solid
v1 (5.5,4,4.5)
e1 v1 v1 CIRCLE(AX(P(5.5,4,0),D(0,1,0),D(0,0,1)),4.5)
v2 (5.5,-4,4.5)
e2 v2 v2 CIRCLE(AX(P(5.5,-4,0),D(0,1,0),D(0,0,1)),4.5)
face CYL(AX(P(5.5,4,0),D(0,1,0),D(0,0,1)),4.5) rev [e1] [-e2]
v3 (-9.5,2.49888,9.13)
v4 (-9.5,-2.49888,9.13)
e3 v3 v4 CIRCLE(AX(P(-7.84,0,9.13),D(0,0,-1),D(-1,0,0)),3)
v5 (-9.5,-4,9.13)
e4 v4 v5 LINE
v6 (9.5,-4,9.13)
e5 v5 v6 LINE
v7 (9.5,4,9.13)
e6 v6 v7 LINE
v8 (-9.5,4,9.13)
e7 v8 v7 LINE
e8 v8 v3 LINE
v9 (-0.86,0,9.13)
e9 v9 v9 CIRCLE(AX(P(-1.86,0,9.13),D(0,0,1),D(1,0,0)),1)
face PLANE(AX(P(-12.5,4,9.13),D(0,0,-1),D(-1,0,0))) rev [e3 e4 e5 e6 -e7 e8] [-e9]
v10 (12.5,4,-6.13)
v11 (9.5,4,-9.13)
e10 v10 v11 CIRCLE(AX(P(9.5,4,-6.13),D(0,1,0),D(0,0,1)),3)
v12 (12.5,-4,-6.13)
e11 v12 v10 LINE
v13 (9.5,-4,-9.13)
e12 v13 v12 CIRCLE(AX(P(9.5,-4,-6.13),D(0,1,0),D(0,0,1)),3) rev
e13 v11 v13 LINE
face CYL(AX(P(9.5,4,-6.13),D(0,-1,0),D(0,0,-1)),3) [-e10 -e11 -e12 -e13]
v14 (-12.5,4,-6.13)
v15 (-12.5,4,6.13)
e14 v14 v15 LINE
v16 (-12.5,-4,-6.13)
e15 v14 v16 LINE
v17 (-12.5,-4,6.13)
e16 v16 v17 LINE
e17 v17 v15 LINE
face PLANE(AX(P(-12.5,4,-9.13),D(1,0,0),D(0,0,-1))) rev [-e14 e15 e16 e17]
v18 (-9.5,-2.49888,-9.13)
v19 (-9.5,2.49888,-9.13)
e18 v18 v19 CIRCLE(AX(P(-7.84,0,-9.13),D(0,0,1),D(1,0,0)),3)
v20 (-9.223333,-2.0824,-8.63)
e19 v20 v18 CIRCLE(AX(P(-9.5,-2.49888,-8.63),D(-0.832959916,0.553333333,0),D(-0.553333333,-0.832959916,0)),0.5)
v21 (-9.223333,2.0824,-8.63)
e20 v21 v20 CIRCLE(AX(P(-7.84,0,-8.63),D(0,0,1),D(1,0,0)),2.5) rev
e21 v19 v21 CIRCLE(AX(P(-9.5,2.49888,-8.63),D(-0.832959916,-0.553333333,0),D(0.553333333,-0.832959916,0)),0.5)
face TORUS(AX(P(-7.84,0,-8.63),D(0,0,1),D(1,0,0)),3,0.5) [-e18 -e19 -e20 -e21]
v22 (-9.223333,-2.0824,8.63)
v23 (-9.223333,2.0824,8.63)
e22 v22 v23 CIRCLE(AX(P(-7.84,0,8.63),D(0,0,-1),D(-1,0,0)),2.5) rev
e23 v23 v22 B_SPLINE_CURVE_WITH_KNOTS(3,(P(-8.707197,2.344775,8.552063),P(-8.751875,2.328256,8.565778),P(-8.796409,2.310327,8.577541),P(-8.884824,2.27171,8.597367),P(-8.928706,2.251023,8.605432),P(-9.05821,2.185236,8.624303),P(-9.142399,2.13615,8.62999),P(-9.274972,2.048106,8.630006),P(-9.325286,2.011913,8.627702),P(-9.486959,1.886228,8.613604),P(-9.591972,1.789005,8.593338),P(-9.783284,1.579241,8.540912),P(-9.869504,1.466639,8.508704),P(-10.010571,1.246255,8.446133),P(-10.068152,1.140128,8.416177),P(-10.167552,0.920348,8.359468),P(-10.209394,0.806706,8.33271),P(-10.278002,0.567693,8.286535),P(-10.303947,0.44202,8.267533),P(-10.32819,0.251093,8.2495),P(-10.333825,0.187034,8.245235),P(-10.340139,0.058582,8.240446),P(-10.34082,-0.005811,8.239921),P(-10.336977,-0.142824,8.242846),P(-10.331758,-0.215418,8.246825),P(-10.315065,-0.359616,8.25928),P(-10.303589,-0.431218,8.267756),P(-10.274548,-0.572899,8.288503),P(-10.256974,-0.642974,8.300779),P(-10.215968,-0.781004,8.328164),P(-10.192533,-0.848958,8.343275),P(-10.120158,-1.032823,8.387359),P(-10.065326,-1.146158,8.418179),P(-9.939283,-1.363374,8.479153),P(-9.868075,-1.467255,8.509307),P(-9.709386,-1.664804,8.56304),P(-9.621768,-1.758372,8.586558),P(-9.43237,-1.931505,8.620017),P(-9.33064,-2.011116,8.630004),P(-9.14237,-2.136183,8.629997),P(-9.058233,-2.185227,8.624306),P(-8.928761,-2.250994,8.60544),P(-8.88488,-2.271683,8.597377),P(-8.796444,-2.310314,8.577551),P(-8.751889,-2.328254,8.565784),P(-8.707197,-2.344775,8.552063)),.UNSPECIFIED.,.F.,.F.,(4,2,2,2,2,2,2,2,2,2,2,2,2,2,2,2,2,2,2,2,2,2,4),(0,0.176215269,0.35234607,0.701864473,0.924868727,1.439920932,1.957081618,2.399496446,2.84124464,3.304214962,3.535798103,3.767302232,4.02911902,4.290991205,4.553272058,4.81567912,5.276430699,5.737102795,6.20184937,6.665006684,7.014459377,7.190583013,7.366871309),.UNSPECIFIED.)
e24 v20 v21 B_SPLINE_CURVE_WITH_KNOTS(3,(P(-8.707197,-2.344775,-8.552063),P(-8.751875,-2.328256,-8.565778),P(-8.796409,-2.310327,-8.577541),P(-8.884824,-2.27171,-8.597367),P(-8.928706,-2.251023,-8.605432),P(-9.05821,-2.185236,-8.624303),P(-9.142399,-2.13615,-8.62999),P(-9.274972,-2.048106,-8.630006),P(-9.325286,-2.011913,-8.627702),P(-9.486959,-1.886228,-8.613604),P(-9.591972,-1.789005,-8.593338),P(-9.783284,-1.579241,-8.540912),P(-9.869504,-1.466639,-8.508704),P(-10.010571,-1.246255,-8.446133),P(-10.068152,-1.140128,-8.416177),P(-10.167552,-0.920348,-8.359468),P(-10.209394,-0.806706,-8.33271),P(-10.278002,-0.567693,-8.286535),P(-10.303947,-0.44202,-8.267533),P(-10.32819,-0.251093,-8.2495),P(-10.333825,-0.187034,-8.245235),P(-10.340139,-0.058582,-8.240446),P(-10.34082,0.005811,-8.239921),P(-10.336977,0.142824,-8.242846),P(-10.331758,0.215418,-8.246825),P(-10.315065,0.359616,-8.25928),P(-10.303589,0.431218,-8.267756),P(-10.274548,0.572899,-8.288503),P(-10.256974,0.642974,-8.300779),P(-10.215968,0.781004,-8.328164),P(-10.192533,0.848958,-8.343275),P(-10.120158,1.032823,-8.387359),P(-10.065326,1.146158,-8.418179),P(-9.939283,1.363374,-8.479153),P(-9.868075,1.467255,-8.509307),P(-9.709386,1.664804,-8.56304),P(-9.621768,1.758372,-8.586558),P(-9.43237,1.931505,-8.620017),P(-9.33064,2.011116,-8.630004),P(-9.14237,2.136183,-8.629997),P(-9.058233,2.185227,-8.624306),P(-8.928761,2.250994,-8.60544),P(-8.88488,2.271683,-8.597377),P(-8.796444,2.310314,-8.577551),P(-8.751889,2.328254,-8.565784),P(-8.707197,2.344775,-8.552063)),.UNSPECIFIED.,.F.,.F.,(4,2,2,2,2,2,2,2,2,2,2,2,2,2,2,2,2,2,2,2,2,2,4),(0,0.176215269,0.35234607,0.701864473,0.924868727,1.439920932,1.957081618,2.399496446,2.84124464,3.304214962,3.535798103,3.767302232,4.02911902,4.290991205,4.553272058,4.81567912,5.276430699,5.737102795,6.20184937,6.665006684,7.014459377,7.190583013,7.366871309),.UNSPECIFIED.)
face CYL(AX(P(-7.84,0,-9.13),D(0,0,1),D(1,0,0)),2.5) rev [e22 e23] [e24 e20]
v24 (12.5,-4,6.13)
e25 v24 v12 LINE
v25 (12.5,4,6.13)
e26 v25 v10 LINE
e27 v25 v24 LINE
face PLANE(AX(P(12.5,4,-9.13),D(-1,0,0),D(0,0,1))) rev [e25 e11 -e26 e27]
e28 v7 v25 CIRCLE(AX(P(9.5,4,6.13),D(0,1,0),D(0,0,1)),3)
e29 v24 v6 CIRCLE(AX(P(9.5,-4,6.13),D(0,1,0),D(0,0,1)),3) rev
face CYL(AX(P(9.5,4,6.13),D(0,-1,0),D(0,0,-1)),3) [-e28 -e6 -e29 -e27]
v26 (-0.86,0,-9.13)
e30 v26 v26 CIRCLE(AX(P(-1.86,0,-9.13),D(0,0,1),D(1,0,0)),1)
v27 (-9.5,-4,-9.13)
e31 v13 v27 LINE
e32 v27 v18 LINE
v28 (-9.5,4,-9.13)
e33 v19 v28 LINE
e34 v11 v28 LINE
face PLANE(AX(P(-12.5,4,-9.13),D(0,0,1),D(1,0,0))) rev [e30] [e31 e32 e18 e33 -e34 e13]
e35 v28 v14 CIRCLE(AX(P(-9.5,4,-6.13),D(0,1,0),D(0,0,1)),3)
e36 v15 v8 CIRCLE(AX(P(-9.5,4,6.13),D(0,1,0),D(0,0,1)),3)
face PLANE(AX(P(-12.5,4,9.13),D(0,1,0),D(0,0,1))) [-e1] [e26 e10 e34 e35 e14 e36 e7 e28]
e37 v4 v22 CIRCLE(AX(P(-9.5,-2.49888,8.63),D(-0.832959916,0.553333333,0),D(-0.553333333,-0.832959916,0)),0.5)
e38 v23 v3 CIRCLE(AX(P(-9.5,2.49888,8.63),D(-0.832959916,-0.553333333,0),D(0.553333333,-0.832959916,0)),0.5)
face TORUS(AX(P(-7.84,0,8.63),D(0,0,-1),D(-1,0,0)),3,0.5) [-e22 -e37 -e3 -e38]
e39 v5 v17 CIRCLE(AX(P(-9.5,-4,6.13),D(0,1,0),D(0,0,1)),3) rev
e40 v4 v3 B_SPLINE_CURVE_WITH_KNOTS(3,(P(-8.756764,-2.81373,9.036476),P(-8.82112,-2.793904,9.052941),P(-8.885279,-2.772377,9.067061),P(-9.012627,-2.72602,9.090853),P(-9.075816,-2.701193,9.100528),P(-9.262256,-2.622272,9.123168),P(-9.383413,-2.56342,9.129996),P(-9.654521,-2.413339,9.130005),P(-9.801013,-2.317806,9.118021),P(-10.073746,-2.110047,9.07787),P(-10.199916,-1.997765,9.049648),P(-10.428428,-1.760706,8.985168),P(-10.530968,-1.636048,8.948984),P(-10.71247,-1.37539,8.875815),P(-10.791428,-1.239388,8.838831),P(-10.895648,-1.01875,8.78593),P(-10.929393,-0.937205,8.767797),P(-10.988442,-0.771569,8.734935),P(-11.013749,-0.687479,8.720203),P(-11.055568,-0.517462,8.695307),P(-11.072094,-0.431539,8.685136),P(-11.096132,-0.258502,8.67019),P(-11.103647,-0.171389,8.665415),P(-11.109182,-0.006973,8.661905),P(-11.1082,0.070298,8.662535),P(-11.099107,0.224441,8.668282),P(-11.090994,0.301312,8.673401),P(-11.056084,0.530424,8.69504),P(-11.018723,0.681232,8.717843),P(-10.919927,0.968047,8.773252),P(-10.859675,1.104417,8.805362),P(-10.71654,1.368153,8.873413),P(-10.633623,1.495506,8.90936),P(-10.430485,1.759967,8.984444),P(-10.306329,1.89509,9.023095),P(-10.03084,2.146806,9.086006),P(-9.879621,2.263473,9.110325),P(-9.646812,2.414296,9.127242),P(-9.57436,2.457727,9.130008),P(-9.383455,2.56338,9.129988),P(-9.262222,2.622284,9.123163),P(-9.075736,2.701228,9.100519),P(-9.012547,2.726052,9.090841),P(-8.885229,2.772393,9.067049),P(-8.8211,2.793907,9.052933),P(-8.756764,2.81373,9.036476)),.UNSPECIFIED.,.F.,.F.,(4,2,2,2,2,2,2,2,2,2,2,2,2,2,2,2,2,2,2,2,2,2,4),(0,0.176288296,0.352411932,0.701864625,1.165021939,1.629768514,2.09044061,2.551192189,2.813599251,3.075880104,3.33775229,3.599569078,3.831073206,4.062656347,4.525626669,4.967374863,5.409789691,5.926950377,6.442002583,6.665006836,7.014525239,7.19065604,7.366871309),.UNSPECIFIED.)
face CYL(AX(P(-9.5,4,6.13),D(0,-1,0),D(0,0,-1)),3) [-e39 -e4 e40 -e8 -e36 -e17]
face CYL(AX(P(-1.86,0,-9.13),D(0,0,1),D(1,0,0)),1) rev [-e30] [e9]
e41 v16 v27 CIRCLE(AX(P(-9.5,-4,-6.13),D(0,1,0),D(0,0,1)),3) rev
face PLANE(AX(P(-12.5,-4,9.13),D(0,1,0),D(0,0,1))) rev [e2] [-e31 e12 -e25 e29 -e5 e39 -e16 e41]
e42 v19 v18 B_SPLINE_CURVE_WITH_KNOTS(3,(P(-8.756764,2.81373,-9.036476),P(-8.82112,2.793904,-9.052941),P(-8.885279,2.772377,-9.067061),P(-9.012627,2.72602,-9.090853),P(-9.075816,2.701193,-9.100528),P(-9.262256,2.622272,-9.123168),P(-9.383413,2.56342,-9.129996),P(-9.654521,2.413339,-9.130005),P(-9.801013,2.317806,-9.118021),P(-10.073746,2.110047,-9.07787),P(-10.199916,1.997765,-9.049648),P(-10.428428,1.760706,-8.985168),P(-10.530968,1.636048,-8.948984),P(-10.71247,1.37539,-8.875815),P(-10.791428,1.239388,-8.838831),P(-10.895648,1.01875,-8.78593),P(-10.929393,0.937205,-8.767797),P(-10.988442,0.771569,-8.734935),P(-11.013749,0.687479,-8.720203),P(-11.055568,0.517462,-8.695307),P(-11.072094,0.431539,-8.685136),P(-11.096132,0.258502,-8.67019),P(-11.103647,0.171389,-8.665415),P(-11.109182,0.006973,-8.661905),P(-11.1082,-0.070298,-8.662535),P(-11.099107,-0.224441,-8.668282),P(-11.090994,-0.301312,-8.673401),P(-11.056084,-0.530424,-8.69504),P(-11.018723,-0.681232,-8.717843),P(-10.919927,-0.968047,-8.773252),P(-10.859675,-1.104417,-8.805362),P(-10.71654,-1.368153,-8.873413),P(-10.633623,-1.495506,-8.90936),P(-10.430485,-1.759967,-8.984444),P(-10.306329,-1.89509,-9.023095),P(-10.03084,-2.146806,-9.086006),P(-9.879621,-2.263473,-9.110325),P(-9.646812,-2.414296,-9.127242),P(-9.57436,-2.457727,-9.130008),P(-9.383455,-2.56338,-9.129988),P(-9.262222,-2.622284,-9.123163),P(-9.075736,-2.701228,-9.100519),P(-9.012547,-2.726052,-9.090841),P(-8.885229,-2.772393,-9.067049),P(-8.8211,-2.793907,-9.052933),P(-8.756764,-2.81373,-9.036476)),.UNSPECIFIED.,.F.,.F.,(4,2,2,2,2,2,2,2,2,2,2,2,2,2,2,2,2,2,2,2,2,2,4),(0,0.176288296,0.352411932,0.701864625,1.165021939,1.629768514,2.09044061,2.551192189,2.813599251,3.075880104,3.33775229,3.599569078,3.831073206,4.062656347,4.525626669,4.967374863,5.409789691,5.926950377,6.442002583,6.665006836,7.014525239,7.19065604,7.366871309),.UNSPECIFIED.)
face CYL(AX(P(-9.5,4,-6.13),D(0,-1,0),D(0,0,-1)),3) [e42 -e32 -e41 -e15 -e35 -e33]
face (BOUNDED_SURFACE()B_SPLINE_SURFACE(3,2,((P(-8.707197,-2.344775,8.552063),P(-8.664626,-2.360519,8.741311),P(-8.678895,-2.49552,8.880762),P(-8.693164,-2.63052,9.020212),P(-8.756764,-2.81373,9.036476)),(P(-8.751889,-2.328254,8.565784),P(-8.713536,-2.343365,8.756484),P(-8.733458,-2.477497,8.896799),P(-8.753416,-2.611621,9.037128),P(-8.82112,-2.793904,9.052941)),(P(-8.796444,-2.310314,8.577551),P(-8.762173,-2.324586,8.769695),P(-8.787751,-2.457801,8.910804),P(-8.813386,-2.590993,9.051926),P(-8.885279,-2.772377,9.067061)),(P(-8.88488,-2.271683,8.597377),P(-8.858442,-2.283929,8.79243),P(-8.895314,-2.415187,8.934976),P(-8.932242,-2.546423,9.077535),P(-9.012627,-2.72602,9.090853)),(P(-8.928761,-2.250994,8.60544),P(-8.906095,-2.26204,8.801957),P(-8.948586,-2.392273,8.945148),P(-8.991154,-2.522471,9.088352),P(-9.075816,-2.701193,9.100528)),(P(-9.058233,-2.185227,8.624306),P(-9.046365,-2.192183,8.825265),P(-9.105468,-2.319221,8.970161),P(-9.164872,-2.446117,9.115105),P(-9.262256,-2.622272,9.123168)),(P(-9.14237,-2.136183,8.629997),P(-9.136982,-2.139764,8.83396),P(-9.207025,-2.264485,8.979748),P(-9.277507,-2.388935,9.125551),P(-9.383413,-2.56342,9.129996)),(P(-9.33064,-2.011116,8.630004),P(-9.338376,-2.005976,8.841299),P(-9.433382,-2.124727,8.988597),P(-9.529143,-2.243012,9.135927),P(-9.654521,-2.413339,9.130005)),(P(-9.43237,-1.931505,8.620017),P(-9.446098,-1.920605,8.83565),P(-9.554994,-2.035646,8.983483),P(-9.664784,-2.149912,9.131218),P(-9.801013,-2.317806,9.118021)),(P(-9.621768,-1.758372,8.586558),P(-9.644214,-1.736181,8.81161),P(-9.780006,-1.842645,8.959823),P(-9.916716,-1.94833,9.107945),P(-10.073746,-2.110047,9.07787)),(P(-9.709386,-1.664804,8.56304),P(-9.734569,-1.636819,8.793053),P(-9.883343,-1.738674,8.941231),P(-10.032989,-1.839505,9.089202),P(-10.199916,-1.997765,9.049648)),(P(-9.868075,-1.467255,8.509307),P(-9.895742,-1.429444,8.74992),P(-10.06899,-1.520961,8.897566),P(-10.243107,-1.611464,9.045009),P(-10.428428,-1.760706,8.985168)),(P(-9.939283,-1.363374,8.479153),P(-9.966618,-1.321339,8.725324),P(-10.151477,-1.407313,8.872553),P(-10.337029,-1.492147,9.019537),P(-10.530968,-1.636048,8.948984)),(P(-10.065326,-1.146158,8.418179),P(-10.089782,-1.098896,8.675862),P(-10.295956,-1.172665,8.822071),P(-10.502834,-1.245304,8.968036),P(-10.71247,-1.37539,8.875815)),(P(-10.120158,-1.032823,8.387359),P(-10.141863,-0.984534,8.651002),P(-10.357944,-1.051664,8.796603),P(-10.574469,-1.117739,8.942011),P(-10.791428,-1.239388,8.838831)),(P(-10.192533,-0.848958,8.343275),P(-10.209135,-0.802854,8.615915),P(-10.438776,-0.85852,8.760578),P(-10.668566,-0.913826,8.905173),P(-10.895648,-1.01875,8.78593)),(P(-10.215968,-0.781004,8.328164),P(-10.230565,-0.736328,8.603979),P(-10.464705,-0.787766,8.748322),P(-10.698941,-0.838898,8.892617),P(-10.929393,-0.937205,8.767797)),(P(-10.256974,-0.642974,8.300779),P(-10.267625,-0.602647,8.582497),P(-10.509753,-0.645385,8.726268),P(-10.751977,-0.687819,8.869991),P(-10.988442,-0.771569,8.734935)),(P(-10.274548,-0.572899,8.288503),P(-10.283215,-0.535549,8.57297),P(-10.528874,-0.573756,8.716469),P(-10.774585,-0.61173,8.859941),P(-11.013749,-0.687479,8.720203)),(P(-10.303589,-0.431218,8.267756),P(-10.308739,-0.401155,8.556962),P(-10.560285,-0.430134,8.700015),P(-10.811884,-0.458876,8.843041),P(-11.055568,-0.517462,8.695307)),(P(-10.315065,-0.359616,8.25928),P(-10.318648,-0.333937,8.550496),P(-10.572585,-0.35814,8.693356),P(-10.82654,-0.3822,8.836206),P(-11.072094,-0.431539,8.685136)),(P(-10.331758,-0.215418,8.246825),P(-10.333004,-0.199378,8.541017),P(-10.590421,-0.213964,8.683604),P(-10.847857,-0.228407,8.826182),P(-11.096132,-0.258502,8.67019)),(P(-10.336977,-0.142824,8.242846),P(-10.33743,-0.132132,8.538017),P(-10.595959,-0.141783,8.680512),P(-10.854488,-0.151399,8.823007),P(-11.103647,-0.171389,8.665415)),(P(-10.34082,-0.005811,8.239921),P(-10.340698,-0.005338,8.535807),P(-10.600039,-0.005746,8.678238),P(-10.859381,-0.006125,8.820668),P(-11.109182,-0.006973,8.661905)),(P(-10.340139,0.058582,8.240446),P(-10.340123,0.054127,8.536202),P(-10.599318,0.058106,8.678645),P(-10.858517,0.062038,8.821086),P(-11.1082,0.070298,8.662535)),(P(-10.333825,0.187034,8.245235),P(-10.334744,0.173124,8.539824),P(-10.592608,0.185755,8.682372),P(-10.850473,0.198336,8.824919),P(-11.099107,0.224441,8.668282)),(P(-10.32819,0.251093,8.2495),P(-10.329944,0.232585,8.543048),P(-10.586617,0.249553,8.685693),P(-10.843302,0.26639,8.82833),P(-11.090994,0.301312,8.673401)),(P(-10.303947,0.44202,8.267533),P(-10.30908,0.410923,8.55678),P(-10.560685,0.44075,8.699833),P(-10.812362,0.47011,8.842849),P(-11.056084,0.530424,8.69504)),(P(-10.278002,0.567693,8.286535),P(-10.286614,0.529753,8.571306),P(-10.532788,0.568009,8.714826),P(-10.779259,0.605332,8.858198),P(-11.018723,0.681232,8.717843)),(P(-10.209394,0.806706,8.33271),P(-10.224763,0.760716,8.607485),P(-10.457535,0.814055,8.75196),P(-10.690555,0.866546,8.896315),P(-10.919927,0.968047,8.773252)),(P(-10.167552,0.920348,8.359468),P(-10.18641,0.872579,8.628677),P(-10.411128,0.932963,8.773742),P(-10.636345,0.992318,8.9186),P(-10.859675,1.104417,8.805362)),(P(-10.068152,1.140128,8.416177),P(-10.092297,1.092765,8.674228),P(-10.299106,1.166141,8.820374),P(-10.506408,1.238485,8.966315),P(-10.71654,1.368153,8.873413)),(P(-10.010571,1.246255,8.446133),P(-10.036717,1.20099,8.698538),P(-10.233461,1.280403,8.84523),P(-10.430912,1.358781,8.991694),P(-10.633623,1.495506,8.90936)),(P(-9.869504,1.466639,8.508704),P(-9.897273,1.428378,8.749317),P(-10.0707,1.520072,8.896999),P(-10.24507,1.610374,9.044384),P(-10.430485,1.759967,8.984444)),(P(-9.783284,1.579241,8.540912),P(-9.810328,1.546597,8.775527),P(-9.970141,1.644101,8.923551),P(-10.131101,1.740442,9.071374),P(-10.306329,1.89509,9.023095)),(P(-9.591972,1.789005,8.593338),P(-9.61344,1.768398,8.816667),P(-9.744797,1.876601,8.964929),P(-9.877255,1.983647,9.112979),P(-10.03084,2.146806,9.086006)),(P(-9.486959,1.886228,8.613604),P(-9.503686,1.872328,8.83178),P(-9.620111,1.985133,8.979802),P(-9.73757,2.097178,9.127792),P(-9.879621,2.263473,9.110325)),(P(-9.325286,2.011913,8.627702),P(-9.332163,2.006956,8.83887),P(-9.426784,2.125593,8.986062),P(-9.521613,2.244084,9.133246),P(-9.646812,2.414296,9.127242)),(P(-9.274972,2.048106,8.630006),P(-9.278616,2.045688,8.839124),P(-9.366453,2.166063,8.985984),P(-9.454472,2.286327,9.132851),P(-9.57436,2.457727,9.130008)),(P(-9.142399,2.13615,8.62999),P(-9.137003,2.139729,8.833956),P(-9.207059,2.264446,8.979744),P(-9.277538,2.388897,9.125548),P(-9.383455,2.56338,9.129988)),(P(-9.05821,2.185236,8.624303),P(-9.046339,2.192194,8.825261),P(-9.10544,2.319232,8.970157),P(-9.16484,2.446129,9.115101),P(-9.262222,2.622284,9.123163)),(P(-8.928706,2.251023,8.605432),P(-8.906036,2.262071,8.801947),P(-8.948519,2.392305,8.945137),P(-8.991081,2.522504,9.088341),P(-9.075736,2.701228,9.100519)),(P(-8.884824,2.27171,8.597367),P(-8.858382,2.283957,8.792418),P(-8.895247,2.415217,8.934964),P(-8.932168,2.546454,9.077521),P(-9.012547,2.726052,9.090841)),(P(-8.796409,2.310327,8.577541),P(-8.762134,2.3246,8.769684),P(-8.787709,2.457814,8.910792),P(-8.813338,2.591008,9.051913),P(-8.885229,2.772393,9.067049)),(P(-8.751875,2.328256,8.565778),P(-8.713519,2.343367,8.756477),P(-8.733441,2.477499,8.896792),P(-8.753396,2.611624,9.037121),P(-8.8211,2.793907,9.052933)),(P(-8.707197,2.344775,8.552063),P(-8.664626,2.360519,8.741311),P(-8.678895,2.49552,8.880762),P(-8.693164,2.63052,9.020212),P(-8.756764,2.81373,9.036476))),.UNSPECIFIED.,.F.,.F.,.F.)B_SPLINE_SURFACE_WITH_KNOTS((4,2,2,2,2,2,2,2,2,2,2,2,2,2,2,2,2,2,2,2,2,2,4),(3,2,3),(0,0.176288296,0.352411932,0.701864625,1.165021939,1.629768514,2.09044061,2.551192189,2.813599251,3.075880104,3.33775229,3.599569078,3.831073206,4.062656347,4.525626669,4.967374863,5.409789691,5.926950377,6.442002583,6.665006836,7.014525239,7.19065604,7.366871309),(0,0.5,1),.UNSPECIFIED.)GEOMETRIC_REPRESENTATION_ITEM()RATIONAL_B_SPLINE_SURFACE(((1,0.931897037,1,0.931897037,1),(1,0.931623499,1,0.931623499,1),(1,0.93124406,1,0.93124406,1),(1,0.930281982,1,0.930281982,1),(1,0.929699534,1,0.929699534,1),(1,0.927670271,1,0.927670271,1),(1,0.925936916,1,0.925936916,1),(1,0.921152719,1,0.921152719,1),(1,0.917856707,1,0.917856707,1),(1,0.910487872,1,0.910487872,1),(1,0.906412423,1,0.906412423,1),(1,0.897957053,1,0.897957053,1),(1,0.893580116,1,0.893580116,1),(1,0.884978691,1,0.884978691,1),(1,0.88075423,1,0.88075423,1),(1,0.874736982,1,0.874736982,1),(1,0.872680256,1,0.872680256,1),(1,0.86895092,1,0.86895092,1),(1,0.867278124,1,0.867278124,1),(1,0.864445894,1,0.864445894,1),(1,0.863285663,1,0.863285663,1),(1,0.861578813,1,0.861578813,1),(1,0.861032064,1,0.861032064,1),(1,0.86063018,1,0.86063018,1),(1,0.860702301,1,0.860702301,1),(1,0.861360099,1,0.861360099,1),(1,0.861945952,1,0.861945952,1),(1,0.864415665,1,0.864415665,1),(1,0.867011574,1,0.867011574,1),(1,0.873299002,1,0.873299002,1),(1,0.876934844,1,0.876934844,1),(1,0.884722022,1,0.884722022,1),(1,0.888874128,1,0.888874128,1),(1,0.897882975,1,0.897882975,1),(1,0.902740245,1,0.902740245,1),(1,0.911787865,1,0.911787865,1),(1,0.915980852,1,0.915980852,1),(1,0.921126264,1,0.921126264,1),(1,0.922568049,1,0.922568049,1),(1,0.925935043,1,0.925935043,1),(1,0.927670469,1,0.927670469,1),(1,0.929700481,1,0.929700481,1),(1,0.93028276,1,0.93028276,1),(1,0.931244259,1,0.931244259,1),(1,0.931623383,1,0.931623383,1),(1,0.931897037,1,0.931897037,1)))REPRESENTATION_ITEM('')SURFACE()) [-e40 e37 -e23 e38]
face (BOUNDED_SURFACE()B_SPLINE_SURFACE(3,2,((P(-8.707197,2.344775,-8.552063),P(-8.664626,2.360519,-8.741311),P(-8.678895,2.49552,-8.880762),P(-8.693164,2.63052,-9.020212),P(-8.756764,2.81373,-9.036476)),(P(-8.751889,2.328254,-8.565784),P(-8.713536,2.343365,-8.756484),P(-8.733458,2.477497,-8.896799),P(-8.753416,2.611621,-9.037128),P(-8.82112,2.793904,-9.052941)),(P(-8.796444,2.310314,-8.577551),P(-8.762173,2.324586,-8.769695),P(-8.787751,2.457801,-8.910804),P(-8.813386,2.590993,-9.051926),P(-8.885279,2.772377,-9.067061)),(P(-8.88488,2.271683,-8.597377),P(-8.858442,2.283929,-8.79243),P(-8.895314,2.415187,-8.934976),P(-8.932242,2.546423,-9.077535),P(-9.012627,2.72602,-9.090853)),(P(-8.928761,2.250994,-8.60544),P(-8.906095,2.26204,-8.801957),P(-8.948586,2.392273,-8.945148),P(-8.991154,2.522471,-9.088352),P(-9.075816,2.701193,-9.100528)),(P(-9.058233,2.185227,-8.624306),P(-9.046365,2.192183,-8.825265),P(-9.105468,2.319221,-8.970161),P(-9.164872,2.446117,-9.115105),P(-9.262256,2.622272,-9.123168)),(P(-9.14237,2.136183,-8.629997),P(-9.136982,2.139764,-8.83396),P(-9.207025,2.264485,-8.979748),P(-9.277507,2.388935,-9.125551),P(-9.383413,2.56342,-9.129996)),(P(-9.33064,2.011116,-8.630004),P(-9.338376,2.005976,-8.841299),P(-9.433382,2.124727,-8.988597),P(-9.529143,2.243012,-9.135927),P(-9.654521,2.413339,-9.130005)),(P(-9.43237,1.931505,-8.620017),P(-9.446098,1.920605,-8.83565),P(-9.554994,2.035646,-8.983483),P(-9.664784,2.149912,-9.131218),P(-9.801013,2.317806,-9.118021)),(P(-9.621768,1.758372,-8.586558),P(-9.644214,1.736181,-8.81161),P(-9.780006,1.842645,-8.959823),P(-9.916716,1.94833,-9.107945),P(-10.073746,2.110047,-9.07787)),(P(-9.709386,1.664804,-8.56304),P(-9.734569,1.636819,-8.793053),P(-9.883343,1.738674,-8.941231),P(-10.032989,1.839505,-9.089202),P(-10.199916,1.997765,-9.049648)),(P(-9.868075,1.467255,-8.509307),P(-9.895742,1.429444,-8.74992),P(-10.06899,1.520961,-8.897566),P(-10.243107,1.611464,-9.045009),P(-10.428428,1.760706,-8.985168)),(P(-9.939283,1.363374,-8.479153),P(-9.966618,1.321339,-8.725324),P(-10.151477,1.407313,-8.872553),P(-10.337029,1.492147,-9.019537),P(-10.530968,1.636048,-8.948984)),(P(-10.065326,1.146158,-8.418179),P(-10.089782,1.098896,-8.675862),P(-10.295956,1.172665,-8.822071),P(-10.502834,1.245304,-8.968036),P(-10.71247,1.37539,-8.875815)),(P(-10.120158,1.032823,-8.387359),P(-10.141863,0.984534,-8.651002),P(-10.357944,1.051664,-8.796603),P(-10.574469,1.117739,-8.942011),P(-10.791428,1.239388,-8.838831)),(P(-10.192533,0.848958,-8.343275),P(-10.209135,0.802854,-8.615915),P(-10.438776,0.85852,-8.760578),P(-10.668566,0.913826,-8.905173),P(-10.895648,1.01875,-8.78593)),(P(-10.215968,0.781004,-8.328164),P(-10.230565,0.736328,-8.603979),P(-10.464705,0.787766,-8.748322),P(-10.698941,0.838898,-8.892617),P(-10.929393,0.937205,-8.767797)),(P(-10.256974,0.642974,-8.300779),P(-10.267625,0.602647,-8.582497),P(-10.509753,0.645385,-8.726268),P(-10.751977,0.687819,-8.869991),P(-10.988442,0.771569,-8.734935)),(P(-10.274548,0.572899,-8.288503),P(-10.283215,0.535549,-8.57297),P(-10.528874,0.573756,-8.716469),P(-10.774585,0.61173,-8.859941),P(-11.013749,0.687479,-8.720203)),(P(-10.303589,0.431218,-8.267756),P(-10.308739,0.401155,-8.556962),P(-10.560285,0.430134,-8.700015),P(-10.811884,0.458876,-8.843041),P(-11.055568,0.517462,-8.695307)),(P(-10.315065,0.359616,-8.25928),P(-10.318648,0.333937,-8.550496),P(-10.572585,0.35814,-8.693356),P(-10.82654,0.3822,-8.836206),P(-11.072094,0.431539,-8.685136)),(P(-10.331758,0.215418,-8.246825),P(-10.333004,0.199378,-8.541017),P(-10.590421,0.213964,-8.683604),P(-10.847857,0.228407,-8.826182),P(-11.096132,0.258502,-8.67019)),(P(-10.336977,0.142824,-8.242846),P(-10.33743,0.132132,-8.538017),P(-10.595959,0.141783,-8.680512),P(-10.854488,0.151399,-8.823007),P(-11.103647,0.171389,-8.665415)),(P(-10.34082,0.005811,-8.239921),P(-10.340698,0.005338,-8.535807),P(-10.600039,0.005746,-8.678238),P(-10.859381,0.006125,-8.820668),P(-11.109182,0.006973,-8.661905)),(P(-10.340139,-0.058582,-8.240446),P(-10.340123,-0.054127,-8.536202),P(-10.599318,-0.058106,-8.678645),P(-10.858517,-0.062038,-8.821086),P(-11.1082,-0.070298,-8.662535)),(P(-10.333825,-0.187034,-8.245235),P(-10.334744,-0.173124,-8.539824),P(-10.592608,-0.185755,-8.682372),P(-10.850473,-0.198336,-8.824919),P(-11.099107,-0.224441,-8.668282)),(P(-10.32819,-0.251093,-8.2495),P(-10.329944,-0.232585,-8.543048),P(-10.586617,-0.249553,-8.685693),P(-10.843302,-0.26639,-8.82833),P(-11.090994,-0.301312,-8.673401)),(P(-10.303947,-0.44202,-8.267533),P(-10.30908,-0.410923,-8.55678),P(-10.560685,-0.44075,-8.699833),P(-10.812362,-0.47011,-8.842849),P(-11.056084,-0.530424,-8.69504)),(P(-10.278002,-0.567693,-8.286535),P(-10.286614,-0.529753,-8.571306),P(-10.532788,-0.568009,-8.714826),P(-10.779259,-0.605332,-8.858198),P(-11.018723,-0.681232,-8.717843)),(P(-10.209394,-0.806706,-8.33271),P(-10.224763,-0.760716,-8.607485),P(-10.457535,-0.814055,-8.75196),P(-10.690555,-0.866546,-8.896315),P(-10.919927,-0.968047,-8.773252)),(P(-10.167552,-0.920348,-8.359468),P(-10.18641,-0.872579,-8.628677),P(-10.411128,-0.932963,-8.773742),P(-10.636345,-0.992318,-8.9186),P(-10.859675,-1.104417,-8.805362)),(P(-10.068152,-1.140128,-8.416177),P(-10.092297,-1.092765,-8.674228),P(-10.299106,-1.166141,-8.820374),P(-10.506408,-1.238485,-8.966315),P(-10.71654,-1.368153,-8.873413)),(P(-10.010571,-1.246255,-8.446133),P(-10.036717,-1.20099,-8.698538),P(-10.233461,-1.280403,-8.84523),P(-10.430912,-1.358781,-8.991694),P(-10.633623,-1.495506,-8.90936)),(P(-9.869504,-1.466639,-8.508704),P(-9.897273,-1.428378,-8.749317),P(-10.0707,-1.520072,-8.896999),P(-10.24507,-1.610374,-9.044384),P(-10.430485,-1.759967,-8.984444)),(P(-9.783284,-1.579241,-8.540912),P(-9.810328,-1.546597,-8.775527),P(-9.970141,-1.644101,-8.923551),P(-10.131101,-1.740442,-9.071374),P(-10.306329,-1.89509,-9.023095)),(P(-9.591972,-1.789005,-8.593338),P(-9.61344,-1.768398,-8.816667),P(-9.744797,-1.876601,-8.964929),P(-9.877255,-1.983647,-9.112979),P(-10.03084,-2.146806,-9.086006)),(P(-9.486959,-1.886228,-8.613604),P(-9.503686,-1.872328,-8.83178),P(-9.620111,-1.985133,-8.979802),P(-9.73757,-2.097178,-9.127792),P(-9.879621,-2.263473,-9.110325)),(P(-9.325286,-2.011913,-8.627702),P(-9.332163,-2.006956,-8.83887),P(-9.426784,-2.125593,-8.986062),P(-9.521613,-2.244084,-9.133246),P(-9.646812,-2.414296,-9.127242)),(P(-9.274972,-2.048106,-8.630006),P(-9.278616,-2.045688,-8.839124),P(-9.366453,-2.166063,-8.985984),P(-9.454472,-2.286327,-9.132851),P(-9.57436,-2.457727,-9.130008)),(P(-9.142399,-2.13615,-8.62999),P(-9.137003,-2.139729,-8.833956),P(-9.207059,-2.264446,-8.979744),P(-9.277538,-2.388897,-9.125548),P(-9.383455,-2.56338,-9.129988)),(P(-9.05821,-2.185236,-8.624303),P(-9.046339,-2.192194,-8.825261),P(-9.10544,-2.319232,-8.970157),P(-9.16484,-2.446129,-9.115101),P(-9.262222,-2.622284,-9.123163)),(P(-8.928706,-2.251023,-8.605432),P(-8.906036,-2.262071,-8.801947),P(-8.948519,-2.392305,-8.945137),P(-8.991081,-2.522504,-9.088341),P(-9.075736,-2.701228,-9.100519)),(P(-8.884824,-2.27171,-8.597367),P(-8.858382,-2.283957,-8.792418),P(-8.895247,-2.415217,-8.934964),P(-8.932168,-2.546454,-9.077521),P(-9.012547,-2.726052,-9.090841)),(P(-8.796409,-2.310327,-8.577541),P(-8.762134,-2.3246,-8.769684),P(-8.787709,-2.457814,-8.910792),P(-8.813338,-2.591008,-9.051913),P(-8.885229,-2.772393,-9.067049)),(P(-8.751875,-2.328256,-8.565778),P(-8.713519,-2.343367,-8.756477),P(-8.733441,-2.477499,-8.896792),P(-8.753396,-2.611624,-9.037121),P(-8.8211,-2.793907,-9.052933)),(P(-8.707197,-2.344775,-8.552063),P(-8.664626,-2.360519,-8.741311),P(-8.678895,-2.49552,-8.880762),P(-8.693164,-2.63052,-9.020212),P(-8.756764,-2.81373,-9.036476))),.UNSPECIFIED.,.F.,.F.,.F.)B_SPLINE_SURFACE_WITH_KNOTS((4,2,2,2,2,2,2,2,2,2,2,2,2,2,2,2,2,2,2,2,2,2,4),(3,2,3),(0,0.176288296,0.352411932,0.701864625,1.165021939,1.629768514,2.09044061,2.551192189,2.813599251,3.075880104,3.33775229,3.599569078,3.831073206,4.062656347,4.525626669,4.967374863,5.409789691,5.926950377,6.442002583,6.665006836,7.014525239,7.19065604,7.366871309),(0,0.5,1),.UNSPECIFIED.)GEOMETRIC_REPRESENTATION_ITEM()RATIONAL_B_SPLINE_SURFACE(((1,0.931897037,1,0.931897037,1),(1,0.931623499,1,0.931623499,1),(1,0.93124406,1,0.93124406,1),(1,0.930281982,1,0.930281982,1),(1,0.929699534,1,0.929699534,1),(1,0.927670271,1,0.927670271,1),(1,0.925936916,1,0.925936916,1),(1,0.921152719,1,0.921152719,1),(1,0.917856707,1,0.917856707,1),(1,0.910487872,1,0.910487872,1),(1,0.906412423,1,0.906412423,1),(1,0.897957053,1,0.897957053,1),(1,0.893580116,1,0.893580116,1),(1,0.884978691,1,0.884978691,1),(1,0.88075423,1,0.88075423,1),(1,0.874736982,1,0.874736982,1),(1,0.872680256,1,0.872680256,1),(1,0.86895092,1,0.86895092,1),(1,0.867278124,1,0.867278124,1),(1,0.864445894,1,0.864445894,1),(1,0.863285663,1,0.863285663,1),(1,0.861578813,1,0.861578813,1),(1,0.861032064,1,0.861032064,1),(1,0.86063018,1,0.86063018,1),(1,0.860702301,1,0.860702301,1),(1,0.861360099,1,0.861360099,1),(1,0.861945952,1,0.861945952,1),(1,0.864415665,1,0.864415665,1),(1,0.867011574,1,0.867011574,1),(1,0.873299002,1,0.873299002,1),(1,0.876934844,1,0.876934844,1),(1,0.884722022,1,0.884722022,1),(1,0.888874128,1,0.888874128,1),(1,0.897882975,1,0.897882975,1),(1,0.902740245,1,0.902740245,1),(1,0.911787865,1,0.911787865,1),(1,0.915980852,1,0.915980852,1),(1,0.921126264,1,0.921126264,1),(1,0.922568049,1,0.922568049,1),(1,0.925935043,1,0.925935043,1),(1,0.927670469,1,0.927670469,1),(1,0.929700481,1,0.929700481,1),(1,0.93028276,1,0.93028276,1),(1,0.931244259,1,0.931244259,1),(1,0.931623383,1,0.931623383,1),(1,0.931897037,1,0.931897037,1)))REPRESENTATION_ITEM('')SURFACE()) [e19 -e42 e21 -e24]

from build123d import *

# Parameters (mm, degrees)
SKETCH1_W                  = 25
SKETCH1_H                  = 18.26
BOSS_EXTRUDE1_DEPTH        = 4
M10X1_0_TAPPED_HOLE1_D     = 9
M10X1_0_TAPPED_HOLE1_DEPTH = 25
M10X1_0_TAPPED_HOLE1_TIP   = 2.703872786
CUT_EXTRUDE1_DEPTH         = 16.987710906
CUT_EXTRUDE1_DEPTH_BACK    = 16.987710906
SKETCH4_R                  = 2.5
SKETCH4_R_2                = 1
FILLET1_R                  = 3
FILLET2_R                  = 0.5


with BuildPart() as part:
    # Sketch1 → Boss-Extrude1 (new, symmetric)
    with BuildSketch(Plane(origin=(0, 0, 0), x_dir=(1, 0, 0), z_dir=(0, 1, 0))):
        Rectangle(SKETCH1_W, SKETCH1_H)
    extrude(amount=BOSS_EXTRUDE1_DEPTH, both=True)

    # M10x1.0 Tapped Hole1
    with Locations(Plane(origin=(0, 4, 0), x_dir=(-1, 0, 0), z_dir=(0, 1, 0))):
        with Locations((-5.5, 0)):
            Hole(M10X1_0_TAPPED_HOLE1_D / 2, depth=M10X1_0_TAPPED_HOLE1_DEPTH)
            with Locations((0, 0, -(M10X1_0_TAPPED_HOLE1_DEPTH + M10X1_0_TAPPED_HOLE1_TIP / 2))):  # 118° drill point
                Cone(0, M10X1_0_TAPPED_HOLE1_D / 2, M10X1_0_TAPPED_HOLE1_TIP, mode=Mode.SUBTRACT)

    # Sketch4 → Cut-Extrude1 (cut, two sides: drawn at the far end of the back side and taken through both)
    with BuildSketch(Plane.XY.offset(-CUT_EXTRUDE1_DEPTH_BACK)):
        with Locations((-7.84, 0)):
            Circle(SKETCH4_R)
        with Locations((-1.86, 0)):
            Circle(SKETCH4_R_2)
    extrude(amount=CUT_EXTRUDE1_DEPTH + CUT_EXTRUDE1_DEPTH_BACK, mode=Mode.SUBTRACT)

    # Fillet1
    # the kernel refuses this fillet: 3 mm, written as the material it takes off along each edge
    with BuildSketch(Plane(origin=(-12.5, -11.5, -9.13), x_dir=(1, 0, 0), z_dir=(0, 1, 0)), Plane(origin=(12.5, 11.5, -9.13), x_dir=(-1, 0, 0), z_dir=(0, -1, 0))) as fillet1_piece_1:
        with BuildLine():
            CenterArc((FILLET1_R, -FILLET1_R), FILLET1_R, 90, 90)
            Line((0, -FILLET1_R), (0, 0))
            Line((0, 0), (FILLET1_R, 0))
        make_face()
    extrude(amount=23, mode=Mode.SUBTRACT)
    with BuildSketch(Plane(origin=(12.5, 11.5, 9.13), x_dir=(-1, 0, 0), z_dir=(0, -1, 0)), Plane(origin=(-12.5, -11.5, 9.13), x_dir=(1, 0, 0), z_dir=(0, 1, 0))) as fillet1_piece_2:
        with BuildLine():
            CenterArc((FILLET1_R, FILLET1_R), FILLET1_R, 180, 90)
            Line((0, FILLET1_R), (0, 0))
            Line((0, 0), (FILLET1_R, 0))
        make_face()
    extrude(amount=23, mode=Mode.SUBTRACT)

    # Fillet2
    fillet2_edges = [part.edges().sort_by_distance(p)[0] for p in [
        (-6.815304923, 2.28035085, -9.13),
        (-6.815304923, -2.28035085, 9.13),
        (-10.34, 0, 9.01),
        (-10.34, 0, -9.01),
    ]]
    fillet(fillet2_edges, radius=FILLET2_R)


solid = part.part
